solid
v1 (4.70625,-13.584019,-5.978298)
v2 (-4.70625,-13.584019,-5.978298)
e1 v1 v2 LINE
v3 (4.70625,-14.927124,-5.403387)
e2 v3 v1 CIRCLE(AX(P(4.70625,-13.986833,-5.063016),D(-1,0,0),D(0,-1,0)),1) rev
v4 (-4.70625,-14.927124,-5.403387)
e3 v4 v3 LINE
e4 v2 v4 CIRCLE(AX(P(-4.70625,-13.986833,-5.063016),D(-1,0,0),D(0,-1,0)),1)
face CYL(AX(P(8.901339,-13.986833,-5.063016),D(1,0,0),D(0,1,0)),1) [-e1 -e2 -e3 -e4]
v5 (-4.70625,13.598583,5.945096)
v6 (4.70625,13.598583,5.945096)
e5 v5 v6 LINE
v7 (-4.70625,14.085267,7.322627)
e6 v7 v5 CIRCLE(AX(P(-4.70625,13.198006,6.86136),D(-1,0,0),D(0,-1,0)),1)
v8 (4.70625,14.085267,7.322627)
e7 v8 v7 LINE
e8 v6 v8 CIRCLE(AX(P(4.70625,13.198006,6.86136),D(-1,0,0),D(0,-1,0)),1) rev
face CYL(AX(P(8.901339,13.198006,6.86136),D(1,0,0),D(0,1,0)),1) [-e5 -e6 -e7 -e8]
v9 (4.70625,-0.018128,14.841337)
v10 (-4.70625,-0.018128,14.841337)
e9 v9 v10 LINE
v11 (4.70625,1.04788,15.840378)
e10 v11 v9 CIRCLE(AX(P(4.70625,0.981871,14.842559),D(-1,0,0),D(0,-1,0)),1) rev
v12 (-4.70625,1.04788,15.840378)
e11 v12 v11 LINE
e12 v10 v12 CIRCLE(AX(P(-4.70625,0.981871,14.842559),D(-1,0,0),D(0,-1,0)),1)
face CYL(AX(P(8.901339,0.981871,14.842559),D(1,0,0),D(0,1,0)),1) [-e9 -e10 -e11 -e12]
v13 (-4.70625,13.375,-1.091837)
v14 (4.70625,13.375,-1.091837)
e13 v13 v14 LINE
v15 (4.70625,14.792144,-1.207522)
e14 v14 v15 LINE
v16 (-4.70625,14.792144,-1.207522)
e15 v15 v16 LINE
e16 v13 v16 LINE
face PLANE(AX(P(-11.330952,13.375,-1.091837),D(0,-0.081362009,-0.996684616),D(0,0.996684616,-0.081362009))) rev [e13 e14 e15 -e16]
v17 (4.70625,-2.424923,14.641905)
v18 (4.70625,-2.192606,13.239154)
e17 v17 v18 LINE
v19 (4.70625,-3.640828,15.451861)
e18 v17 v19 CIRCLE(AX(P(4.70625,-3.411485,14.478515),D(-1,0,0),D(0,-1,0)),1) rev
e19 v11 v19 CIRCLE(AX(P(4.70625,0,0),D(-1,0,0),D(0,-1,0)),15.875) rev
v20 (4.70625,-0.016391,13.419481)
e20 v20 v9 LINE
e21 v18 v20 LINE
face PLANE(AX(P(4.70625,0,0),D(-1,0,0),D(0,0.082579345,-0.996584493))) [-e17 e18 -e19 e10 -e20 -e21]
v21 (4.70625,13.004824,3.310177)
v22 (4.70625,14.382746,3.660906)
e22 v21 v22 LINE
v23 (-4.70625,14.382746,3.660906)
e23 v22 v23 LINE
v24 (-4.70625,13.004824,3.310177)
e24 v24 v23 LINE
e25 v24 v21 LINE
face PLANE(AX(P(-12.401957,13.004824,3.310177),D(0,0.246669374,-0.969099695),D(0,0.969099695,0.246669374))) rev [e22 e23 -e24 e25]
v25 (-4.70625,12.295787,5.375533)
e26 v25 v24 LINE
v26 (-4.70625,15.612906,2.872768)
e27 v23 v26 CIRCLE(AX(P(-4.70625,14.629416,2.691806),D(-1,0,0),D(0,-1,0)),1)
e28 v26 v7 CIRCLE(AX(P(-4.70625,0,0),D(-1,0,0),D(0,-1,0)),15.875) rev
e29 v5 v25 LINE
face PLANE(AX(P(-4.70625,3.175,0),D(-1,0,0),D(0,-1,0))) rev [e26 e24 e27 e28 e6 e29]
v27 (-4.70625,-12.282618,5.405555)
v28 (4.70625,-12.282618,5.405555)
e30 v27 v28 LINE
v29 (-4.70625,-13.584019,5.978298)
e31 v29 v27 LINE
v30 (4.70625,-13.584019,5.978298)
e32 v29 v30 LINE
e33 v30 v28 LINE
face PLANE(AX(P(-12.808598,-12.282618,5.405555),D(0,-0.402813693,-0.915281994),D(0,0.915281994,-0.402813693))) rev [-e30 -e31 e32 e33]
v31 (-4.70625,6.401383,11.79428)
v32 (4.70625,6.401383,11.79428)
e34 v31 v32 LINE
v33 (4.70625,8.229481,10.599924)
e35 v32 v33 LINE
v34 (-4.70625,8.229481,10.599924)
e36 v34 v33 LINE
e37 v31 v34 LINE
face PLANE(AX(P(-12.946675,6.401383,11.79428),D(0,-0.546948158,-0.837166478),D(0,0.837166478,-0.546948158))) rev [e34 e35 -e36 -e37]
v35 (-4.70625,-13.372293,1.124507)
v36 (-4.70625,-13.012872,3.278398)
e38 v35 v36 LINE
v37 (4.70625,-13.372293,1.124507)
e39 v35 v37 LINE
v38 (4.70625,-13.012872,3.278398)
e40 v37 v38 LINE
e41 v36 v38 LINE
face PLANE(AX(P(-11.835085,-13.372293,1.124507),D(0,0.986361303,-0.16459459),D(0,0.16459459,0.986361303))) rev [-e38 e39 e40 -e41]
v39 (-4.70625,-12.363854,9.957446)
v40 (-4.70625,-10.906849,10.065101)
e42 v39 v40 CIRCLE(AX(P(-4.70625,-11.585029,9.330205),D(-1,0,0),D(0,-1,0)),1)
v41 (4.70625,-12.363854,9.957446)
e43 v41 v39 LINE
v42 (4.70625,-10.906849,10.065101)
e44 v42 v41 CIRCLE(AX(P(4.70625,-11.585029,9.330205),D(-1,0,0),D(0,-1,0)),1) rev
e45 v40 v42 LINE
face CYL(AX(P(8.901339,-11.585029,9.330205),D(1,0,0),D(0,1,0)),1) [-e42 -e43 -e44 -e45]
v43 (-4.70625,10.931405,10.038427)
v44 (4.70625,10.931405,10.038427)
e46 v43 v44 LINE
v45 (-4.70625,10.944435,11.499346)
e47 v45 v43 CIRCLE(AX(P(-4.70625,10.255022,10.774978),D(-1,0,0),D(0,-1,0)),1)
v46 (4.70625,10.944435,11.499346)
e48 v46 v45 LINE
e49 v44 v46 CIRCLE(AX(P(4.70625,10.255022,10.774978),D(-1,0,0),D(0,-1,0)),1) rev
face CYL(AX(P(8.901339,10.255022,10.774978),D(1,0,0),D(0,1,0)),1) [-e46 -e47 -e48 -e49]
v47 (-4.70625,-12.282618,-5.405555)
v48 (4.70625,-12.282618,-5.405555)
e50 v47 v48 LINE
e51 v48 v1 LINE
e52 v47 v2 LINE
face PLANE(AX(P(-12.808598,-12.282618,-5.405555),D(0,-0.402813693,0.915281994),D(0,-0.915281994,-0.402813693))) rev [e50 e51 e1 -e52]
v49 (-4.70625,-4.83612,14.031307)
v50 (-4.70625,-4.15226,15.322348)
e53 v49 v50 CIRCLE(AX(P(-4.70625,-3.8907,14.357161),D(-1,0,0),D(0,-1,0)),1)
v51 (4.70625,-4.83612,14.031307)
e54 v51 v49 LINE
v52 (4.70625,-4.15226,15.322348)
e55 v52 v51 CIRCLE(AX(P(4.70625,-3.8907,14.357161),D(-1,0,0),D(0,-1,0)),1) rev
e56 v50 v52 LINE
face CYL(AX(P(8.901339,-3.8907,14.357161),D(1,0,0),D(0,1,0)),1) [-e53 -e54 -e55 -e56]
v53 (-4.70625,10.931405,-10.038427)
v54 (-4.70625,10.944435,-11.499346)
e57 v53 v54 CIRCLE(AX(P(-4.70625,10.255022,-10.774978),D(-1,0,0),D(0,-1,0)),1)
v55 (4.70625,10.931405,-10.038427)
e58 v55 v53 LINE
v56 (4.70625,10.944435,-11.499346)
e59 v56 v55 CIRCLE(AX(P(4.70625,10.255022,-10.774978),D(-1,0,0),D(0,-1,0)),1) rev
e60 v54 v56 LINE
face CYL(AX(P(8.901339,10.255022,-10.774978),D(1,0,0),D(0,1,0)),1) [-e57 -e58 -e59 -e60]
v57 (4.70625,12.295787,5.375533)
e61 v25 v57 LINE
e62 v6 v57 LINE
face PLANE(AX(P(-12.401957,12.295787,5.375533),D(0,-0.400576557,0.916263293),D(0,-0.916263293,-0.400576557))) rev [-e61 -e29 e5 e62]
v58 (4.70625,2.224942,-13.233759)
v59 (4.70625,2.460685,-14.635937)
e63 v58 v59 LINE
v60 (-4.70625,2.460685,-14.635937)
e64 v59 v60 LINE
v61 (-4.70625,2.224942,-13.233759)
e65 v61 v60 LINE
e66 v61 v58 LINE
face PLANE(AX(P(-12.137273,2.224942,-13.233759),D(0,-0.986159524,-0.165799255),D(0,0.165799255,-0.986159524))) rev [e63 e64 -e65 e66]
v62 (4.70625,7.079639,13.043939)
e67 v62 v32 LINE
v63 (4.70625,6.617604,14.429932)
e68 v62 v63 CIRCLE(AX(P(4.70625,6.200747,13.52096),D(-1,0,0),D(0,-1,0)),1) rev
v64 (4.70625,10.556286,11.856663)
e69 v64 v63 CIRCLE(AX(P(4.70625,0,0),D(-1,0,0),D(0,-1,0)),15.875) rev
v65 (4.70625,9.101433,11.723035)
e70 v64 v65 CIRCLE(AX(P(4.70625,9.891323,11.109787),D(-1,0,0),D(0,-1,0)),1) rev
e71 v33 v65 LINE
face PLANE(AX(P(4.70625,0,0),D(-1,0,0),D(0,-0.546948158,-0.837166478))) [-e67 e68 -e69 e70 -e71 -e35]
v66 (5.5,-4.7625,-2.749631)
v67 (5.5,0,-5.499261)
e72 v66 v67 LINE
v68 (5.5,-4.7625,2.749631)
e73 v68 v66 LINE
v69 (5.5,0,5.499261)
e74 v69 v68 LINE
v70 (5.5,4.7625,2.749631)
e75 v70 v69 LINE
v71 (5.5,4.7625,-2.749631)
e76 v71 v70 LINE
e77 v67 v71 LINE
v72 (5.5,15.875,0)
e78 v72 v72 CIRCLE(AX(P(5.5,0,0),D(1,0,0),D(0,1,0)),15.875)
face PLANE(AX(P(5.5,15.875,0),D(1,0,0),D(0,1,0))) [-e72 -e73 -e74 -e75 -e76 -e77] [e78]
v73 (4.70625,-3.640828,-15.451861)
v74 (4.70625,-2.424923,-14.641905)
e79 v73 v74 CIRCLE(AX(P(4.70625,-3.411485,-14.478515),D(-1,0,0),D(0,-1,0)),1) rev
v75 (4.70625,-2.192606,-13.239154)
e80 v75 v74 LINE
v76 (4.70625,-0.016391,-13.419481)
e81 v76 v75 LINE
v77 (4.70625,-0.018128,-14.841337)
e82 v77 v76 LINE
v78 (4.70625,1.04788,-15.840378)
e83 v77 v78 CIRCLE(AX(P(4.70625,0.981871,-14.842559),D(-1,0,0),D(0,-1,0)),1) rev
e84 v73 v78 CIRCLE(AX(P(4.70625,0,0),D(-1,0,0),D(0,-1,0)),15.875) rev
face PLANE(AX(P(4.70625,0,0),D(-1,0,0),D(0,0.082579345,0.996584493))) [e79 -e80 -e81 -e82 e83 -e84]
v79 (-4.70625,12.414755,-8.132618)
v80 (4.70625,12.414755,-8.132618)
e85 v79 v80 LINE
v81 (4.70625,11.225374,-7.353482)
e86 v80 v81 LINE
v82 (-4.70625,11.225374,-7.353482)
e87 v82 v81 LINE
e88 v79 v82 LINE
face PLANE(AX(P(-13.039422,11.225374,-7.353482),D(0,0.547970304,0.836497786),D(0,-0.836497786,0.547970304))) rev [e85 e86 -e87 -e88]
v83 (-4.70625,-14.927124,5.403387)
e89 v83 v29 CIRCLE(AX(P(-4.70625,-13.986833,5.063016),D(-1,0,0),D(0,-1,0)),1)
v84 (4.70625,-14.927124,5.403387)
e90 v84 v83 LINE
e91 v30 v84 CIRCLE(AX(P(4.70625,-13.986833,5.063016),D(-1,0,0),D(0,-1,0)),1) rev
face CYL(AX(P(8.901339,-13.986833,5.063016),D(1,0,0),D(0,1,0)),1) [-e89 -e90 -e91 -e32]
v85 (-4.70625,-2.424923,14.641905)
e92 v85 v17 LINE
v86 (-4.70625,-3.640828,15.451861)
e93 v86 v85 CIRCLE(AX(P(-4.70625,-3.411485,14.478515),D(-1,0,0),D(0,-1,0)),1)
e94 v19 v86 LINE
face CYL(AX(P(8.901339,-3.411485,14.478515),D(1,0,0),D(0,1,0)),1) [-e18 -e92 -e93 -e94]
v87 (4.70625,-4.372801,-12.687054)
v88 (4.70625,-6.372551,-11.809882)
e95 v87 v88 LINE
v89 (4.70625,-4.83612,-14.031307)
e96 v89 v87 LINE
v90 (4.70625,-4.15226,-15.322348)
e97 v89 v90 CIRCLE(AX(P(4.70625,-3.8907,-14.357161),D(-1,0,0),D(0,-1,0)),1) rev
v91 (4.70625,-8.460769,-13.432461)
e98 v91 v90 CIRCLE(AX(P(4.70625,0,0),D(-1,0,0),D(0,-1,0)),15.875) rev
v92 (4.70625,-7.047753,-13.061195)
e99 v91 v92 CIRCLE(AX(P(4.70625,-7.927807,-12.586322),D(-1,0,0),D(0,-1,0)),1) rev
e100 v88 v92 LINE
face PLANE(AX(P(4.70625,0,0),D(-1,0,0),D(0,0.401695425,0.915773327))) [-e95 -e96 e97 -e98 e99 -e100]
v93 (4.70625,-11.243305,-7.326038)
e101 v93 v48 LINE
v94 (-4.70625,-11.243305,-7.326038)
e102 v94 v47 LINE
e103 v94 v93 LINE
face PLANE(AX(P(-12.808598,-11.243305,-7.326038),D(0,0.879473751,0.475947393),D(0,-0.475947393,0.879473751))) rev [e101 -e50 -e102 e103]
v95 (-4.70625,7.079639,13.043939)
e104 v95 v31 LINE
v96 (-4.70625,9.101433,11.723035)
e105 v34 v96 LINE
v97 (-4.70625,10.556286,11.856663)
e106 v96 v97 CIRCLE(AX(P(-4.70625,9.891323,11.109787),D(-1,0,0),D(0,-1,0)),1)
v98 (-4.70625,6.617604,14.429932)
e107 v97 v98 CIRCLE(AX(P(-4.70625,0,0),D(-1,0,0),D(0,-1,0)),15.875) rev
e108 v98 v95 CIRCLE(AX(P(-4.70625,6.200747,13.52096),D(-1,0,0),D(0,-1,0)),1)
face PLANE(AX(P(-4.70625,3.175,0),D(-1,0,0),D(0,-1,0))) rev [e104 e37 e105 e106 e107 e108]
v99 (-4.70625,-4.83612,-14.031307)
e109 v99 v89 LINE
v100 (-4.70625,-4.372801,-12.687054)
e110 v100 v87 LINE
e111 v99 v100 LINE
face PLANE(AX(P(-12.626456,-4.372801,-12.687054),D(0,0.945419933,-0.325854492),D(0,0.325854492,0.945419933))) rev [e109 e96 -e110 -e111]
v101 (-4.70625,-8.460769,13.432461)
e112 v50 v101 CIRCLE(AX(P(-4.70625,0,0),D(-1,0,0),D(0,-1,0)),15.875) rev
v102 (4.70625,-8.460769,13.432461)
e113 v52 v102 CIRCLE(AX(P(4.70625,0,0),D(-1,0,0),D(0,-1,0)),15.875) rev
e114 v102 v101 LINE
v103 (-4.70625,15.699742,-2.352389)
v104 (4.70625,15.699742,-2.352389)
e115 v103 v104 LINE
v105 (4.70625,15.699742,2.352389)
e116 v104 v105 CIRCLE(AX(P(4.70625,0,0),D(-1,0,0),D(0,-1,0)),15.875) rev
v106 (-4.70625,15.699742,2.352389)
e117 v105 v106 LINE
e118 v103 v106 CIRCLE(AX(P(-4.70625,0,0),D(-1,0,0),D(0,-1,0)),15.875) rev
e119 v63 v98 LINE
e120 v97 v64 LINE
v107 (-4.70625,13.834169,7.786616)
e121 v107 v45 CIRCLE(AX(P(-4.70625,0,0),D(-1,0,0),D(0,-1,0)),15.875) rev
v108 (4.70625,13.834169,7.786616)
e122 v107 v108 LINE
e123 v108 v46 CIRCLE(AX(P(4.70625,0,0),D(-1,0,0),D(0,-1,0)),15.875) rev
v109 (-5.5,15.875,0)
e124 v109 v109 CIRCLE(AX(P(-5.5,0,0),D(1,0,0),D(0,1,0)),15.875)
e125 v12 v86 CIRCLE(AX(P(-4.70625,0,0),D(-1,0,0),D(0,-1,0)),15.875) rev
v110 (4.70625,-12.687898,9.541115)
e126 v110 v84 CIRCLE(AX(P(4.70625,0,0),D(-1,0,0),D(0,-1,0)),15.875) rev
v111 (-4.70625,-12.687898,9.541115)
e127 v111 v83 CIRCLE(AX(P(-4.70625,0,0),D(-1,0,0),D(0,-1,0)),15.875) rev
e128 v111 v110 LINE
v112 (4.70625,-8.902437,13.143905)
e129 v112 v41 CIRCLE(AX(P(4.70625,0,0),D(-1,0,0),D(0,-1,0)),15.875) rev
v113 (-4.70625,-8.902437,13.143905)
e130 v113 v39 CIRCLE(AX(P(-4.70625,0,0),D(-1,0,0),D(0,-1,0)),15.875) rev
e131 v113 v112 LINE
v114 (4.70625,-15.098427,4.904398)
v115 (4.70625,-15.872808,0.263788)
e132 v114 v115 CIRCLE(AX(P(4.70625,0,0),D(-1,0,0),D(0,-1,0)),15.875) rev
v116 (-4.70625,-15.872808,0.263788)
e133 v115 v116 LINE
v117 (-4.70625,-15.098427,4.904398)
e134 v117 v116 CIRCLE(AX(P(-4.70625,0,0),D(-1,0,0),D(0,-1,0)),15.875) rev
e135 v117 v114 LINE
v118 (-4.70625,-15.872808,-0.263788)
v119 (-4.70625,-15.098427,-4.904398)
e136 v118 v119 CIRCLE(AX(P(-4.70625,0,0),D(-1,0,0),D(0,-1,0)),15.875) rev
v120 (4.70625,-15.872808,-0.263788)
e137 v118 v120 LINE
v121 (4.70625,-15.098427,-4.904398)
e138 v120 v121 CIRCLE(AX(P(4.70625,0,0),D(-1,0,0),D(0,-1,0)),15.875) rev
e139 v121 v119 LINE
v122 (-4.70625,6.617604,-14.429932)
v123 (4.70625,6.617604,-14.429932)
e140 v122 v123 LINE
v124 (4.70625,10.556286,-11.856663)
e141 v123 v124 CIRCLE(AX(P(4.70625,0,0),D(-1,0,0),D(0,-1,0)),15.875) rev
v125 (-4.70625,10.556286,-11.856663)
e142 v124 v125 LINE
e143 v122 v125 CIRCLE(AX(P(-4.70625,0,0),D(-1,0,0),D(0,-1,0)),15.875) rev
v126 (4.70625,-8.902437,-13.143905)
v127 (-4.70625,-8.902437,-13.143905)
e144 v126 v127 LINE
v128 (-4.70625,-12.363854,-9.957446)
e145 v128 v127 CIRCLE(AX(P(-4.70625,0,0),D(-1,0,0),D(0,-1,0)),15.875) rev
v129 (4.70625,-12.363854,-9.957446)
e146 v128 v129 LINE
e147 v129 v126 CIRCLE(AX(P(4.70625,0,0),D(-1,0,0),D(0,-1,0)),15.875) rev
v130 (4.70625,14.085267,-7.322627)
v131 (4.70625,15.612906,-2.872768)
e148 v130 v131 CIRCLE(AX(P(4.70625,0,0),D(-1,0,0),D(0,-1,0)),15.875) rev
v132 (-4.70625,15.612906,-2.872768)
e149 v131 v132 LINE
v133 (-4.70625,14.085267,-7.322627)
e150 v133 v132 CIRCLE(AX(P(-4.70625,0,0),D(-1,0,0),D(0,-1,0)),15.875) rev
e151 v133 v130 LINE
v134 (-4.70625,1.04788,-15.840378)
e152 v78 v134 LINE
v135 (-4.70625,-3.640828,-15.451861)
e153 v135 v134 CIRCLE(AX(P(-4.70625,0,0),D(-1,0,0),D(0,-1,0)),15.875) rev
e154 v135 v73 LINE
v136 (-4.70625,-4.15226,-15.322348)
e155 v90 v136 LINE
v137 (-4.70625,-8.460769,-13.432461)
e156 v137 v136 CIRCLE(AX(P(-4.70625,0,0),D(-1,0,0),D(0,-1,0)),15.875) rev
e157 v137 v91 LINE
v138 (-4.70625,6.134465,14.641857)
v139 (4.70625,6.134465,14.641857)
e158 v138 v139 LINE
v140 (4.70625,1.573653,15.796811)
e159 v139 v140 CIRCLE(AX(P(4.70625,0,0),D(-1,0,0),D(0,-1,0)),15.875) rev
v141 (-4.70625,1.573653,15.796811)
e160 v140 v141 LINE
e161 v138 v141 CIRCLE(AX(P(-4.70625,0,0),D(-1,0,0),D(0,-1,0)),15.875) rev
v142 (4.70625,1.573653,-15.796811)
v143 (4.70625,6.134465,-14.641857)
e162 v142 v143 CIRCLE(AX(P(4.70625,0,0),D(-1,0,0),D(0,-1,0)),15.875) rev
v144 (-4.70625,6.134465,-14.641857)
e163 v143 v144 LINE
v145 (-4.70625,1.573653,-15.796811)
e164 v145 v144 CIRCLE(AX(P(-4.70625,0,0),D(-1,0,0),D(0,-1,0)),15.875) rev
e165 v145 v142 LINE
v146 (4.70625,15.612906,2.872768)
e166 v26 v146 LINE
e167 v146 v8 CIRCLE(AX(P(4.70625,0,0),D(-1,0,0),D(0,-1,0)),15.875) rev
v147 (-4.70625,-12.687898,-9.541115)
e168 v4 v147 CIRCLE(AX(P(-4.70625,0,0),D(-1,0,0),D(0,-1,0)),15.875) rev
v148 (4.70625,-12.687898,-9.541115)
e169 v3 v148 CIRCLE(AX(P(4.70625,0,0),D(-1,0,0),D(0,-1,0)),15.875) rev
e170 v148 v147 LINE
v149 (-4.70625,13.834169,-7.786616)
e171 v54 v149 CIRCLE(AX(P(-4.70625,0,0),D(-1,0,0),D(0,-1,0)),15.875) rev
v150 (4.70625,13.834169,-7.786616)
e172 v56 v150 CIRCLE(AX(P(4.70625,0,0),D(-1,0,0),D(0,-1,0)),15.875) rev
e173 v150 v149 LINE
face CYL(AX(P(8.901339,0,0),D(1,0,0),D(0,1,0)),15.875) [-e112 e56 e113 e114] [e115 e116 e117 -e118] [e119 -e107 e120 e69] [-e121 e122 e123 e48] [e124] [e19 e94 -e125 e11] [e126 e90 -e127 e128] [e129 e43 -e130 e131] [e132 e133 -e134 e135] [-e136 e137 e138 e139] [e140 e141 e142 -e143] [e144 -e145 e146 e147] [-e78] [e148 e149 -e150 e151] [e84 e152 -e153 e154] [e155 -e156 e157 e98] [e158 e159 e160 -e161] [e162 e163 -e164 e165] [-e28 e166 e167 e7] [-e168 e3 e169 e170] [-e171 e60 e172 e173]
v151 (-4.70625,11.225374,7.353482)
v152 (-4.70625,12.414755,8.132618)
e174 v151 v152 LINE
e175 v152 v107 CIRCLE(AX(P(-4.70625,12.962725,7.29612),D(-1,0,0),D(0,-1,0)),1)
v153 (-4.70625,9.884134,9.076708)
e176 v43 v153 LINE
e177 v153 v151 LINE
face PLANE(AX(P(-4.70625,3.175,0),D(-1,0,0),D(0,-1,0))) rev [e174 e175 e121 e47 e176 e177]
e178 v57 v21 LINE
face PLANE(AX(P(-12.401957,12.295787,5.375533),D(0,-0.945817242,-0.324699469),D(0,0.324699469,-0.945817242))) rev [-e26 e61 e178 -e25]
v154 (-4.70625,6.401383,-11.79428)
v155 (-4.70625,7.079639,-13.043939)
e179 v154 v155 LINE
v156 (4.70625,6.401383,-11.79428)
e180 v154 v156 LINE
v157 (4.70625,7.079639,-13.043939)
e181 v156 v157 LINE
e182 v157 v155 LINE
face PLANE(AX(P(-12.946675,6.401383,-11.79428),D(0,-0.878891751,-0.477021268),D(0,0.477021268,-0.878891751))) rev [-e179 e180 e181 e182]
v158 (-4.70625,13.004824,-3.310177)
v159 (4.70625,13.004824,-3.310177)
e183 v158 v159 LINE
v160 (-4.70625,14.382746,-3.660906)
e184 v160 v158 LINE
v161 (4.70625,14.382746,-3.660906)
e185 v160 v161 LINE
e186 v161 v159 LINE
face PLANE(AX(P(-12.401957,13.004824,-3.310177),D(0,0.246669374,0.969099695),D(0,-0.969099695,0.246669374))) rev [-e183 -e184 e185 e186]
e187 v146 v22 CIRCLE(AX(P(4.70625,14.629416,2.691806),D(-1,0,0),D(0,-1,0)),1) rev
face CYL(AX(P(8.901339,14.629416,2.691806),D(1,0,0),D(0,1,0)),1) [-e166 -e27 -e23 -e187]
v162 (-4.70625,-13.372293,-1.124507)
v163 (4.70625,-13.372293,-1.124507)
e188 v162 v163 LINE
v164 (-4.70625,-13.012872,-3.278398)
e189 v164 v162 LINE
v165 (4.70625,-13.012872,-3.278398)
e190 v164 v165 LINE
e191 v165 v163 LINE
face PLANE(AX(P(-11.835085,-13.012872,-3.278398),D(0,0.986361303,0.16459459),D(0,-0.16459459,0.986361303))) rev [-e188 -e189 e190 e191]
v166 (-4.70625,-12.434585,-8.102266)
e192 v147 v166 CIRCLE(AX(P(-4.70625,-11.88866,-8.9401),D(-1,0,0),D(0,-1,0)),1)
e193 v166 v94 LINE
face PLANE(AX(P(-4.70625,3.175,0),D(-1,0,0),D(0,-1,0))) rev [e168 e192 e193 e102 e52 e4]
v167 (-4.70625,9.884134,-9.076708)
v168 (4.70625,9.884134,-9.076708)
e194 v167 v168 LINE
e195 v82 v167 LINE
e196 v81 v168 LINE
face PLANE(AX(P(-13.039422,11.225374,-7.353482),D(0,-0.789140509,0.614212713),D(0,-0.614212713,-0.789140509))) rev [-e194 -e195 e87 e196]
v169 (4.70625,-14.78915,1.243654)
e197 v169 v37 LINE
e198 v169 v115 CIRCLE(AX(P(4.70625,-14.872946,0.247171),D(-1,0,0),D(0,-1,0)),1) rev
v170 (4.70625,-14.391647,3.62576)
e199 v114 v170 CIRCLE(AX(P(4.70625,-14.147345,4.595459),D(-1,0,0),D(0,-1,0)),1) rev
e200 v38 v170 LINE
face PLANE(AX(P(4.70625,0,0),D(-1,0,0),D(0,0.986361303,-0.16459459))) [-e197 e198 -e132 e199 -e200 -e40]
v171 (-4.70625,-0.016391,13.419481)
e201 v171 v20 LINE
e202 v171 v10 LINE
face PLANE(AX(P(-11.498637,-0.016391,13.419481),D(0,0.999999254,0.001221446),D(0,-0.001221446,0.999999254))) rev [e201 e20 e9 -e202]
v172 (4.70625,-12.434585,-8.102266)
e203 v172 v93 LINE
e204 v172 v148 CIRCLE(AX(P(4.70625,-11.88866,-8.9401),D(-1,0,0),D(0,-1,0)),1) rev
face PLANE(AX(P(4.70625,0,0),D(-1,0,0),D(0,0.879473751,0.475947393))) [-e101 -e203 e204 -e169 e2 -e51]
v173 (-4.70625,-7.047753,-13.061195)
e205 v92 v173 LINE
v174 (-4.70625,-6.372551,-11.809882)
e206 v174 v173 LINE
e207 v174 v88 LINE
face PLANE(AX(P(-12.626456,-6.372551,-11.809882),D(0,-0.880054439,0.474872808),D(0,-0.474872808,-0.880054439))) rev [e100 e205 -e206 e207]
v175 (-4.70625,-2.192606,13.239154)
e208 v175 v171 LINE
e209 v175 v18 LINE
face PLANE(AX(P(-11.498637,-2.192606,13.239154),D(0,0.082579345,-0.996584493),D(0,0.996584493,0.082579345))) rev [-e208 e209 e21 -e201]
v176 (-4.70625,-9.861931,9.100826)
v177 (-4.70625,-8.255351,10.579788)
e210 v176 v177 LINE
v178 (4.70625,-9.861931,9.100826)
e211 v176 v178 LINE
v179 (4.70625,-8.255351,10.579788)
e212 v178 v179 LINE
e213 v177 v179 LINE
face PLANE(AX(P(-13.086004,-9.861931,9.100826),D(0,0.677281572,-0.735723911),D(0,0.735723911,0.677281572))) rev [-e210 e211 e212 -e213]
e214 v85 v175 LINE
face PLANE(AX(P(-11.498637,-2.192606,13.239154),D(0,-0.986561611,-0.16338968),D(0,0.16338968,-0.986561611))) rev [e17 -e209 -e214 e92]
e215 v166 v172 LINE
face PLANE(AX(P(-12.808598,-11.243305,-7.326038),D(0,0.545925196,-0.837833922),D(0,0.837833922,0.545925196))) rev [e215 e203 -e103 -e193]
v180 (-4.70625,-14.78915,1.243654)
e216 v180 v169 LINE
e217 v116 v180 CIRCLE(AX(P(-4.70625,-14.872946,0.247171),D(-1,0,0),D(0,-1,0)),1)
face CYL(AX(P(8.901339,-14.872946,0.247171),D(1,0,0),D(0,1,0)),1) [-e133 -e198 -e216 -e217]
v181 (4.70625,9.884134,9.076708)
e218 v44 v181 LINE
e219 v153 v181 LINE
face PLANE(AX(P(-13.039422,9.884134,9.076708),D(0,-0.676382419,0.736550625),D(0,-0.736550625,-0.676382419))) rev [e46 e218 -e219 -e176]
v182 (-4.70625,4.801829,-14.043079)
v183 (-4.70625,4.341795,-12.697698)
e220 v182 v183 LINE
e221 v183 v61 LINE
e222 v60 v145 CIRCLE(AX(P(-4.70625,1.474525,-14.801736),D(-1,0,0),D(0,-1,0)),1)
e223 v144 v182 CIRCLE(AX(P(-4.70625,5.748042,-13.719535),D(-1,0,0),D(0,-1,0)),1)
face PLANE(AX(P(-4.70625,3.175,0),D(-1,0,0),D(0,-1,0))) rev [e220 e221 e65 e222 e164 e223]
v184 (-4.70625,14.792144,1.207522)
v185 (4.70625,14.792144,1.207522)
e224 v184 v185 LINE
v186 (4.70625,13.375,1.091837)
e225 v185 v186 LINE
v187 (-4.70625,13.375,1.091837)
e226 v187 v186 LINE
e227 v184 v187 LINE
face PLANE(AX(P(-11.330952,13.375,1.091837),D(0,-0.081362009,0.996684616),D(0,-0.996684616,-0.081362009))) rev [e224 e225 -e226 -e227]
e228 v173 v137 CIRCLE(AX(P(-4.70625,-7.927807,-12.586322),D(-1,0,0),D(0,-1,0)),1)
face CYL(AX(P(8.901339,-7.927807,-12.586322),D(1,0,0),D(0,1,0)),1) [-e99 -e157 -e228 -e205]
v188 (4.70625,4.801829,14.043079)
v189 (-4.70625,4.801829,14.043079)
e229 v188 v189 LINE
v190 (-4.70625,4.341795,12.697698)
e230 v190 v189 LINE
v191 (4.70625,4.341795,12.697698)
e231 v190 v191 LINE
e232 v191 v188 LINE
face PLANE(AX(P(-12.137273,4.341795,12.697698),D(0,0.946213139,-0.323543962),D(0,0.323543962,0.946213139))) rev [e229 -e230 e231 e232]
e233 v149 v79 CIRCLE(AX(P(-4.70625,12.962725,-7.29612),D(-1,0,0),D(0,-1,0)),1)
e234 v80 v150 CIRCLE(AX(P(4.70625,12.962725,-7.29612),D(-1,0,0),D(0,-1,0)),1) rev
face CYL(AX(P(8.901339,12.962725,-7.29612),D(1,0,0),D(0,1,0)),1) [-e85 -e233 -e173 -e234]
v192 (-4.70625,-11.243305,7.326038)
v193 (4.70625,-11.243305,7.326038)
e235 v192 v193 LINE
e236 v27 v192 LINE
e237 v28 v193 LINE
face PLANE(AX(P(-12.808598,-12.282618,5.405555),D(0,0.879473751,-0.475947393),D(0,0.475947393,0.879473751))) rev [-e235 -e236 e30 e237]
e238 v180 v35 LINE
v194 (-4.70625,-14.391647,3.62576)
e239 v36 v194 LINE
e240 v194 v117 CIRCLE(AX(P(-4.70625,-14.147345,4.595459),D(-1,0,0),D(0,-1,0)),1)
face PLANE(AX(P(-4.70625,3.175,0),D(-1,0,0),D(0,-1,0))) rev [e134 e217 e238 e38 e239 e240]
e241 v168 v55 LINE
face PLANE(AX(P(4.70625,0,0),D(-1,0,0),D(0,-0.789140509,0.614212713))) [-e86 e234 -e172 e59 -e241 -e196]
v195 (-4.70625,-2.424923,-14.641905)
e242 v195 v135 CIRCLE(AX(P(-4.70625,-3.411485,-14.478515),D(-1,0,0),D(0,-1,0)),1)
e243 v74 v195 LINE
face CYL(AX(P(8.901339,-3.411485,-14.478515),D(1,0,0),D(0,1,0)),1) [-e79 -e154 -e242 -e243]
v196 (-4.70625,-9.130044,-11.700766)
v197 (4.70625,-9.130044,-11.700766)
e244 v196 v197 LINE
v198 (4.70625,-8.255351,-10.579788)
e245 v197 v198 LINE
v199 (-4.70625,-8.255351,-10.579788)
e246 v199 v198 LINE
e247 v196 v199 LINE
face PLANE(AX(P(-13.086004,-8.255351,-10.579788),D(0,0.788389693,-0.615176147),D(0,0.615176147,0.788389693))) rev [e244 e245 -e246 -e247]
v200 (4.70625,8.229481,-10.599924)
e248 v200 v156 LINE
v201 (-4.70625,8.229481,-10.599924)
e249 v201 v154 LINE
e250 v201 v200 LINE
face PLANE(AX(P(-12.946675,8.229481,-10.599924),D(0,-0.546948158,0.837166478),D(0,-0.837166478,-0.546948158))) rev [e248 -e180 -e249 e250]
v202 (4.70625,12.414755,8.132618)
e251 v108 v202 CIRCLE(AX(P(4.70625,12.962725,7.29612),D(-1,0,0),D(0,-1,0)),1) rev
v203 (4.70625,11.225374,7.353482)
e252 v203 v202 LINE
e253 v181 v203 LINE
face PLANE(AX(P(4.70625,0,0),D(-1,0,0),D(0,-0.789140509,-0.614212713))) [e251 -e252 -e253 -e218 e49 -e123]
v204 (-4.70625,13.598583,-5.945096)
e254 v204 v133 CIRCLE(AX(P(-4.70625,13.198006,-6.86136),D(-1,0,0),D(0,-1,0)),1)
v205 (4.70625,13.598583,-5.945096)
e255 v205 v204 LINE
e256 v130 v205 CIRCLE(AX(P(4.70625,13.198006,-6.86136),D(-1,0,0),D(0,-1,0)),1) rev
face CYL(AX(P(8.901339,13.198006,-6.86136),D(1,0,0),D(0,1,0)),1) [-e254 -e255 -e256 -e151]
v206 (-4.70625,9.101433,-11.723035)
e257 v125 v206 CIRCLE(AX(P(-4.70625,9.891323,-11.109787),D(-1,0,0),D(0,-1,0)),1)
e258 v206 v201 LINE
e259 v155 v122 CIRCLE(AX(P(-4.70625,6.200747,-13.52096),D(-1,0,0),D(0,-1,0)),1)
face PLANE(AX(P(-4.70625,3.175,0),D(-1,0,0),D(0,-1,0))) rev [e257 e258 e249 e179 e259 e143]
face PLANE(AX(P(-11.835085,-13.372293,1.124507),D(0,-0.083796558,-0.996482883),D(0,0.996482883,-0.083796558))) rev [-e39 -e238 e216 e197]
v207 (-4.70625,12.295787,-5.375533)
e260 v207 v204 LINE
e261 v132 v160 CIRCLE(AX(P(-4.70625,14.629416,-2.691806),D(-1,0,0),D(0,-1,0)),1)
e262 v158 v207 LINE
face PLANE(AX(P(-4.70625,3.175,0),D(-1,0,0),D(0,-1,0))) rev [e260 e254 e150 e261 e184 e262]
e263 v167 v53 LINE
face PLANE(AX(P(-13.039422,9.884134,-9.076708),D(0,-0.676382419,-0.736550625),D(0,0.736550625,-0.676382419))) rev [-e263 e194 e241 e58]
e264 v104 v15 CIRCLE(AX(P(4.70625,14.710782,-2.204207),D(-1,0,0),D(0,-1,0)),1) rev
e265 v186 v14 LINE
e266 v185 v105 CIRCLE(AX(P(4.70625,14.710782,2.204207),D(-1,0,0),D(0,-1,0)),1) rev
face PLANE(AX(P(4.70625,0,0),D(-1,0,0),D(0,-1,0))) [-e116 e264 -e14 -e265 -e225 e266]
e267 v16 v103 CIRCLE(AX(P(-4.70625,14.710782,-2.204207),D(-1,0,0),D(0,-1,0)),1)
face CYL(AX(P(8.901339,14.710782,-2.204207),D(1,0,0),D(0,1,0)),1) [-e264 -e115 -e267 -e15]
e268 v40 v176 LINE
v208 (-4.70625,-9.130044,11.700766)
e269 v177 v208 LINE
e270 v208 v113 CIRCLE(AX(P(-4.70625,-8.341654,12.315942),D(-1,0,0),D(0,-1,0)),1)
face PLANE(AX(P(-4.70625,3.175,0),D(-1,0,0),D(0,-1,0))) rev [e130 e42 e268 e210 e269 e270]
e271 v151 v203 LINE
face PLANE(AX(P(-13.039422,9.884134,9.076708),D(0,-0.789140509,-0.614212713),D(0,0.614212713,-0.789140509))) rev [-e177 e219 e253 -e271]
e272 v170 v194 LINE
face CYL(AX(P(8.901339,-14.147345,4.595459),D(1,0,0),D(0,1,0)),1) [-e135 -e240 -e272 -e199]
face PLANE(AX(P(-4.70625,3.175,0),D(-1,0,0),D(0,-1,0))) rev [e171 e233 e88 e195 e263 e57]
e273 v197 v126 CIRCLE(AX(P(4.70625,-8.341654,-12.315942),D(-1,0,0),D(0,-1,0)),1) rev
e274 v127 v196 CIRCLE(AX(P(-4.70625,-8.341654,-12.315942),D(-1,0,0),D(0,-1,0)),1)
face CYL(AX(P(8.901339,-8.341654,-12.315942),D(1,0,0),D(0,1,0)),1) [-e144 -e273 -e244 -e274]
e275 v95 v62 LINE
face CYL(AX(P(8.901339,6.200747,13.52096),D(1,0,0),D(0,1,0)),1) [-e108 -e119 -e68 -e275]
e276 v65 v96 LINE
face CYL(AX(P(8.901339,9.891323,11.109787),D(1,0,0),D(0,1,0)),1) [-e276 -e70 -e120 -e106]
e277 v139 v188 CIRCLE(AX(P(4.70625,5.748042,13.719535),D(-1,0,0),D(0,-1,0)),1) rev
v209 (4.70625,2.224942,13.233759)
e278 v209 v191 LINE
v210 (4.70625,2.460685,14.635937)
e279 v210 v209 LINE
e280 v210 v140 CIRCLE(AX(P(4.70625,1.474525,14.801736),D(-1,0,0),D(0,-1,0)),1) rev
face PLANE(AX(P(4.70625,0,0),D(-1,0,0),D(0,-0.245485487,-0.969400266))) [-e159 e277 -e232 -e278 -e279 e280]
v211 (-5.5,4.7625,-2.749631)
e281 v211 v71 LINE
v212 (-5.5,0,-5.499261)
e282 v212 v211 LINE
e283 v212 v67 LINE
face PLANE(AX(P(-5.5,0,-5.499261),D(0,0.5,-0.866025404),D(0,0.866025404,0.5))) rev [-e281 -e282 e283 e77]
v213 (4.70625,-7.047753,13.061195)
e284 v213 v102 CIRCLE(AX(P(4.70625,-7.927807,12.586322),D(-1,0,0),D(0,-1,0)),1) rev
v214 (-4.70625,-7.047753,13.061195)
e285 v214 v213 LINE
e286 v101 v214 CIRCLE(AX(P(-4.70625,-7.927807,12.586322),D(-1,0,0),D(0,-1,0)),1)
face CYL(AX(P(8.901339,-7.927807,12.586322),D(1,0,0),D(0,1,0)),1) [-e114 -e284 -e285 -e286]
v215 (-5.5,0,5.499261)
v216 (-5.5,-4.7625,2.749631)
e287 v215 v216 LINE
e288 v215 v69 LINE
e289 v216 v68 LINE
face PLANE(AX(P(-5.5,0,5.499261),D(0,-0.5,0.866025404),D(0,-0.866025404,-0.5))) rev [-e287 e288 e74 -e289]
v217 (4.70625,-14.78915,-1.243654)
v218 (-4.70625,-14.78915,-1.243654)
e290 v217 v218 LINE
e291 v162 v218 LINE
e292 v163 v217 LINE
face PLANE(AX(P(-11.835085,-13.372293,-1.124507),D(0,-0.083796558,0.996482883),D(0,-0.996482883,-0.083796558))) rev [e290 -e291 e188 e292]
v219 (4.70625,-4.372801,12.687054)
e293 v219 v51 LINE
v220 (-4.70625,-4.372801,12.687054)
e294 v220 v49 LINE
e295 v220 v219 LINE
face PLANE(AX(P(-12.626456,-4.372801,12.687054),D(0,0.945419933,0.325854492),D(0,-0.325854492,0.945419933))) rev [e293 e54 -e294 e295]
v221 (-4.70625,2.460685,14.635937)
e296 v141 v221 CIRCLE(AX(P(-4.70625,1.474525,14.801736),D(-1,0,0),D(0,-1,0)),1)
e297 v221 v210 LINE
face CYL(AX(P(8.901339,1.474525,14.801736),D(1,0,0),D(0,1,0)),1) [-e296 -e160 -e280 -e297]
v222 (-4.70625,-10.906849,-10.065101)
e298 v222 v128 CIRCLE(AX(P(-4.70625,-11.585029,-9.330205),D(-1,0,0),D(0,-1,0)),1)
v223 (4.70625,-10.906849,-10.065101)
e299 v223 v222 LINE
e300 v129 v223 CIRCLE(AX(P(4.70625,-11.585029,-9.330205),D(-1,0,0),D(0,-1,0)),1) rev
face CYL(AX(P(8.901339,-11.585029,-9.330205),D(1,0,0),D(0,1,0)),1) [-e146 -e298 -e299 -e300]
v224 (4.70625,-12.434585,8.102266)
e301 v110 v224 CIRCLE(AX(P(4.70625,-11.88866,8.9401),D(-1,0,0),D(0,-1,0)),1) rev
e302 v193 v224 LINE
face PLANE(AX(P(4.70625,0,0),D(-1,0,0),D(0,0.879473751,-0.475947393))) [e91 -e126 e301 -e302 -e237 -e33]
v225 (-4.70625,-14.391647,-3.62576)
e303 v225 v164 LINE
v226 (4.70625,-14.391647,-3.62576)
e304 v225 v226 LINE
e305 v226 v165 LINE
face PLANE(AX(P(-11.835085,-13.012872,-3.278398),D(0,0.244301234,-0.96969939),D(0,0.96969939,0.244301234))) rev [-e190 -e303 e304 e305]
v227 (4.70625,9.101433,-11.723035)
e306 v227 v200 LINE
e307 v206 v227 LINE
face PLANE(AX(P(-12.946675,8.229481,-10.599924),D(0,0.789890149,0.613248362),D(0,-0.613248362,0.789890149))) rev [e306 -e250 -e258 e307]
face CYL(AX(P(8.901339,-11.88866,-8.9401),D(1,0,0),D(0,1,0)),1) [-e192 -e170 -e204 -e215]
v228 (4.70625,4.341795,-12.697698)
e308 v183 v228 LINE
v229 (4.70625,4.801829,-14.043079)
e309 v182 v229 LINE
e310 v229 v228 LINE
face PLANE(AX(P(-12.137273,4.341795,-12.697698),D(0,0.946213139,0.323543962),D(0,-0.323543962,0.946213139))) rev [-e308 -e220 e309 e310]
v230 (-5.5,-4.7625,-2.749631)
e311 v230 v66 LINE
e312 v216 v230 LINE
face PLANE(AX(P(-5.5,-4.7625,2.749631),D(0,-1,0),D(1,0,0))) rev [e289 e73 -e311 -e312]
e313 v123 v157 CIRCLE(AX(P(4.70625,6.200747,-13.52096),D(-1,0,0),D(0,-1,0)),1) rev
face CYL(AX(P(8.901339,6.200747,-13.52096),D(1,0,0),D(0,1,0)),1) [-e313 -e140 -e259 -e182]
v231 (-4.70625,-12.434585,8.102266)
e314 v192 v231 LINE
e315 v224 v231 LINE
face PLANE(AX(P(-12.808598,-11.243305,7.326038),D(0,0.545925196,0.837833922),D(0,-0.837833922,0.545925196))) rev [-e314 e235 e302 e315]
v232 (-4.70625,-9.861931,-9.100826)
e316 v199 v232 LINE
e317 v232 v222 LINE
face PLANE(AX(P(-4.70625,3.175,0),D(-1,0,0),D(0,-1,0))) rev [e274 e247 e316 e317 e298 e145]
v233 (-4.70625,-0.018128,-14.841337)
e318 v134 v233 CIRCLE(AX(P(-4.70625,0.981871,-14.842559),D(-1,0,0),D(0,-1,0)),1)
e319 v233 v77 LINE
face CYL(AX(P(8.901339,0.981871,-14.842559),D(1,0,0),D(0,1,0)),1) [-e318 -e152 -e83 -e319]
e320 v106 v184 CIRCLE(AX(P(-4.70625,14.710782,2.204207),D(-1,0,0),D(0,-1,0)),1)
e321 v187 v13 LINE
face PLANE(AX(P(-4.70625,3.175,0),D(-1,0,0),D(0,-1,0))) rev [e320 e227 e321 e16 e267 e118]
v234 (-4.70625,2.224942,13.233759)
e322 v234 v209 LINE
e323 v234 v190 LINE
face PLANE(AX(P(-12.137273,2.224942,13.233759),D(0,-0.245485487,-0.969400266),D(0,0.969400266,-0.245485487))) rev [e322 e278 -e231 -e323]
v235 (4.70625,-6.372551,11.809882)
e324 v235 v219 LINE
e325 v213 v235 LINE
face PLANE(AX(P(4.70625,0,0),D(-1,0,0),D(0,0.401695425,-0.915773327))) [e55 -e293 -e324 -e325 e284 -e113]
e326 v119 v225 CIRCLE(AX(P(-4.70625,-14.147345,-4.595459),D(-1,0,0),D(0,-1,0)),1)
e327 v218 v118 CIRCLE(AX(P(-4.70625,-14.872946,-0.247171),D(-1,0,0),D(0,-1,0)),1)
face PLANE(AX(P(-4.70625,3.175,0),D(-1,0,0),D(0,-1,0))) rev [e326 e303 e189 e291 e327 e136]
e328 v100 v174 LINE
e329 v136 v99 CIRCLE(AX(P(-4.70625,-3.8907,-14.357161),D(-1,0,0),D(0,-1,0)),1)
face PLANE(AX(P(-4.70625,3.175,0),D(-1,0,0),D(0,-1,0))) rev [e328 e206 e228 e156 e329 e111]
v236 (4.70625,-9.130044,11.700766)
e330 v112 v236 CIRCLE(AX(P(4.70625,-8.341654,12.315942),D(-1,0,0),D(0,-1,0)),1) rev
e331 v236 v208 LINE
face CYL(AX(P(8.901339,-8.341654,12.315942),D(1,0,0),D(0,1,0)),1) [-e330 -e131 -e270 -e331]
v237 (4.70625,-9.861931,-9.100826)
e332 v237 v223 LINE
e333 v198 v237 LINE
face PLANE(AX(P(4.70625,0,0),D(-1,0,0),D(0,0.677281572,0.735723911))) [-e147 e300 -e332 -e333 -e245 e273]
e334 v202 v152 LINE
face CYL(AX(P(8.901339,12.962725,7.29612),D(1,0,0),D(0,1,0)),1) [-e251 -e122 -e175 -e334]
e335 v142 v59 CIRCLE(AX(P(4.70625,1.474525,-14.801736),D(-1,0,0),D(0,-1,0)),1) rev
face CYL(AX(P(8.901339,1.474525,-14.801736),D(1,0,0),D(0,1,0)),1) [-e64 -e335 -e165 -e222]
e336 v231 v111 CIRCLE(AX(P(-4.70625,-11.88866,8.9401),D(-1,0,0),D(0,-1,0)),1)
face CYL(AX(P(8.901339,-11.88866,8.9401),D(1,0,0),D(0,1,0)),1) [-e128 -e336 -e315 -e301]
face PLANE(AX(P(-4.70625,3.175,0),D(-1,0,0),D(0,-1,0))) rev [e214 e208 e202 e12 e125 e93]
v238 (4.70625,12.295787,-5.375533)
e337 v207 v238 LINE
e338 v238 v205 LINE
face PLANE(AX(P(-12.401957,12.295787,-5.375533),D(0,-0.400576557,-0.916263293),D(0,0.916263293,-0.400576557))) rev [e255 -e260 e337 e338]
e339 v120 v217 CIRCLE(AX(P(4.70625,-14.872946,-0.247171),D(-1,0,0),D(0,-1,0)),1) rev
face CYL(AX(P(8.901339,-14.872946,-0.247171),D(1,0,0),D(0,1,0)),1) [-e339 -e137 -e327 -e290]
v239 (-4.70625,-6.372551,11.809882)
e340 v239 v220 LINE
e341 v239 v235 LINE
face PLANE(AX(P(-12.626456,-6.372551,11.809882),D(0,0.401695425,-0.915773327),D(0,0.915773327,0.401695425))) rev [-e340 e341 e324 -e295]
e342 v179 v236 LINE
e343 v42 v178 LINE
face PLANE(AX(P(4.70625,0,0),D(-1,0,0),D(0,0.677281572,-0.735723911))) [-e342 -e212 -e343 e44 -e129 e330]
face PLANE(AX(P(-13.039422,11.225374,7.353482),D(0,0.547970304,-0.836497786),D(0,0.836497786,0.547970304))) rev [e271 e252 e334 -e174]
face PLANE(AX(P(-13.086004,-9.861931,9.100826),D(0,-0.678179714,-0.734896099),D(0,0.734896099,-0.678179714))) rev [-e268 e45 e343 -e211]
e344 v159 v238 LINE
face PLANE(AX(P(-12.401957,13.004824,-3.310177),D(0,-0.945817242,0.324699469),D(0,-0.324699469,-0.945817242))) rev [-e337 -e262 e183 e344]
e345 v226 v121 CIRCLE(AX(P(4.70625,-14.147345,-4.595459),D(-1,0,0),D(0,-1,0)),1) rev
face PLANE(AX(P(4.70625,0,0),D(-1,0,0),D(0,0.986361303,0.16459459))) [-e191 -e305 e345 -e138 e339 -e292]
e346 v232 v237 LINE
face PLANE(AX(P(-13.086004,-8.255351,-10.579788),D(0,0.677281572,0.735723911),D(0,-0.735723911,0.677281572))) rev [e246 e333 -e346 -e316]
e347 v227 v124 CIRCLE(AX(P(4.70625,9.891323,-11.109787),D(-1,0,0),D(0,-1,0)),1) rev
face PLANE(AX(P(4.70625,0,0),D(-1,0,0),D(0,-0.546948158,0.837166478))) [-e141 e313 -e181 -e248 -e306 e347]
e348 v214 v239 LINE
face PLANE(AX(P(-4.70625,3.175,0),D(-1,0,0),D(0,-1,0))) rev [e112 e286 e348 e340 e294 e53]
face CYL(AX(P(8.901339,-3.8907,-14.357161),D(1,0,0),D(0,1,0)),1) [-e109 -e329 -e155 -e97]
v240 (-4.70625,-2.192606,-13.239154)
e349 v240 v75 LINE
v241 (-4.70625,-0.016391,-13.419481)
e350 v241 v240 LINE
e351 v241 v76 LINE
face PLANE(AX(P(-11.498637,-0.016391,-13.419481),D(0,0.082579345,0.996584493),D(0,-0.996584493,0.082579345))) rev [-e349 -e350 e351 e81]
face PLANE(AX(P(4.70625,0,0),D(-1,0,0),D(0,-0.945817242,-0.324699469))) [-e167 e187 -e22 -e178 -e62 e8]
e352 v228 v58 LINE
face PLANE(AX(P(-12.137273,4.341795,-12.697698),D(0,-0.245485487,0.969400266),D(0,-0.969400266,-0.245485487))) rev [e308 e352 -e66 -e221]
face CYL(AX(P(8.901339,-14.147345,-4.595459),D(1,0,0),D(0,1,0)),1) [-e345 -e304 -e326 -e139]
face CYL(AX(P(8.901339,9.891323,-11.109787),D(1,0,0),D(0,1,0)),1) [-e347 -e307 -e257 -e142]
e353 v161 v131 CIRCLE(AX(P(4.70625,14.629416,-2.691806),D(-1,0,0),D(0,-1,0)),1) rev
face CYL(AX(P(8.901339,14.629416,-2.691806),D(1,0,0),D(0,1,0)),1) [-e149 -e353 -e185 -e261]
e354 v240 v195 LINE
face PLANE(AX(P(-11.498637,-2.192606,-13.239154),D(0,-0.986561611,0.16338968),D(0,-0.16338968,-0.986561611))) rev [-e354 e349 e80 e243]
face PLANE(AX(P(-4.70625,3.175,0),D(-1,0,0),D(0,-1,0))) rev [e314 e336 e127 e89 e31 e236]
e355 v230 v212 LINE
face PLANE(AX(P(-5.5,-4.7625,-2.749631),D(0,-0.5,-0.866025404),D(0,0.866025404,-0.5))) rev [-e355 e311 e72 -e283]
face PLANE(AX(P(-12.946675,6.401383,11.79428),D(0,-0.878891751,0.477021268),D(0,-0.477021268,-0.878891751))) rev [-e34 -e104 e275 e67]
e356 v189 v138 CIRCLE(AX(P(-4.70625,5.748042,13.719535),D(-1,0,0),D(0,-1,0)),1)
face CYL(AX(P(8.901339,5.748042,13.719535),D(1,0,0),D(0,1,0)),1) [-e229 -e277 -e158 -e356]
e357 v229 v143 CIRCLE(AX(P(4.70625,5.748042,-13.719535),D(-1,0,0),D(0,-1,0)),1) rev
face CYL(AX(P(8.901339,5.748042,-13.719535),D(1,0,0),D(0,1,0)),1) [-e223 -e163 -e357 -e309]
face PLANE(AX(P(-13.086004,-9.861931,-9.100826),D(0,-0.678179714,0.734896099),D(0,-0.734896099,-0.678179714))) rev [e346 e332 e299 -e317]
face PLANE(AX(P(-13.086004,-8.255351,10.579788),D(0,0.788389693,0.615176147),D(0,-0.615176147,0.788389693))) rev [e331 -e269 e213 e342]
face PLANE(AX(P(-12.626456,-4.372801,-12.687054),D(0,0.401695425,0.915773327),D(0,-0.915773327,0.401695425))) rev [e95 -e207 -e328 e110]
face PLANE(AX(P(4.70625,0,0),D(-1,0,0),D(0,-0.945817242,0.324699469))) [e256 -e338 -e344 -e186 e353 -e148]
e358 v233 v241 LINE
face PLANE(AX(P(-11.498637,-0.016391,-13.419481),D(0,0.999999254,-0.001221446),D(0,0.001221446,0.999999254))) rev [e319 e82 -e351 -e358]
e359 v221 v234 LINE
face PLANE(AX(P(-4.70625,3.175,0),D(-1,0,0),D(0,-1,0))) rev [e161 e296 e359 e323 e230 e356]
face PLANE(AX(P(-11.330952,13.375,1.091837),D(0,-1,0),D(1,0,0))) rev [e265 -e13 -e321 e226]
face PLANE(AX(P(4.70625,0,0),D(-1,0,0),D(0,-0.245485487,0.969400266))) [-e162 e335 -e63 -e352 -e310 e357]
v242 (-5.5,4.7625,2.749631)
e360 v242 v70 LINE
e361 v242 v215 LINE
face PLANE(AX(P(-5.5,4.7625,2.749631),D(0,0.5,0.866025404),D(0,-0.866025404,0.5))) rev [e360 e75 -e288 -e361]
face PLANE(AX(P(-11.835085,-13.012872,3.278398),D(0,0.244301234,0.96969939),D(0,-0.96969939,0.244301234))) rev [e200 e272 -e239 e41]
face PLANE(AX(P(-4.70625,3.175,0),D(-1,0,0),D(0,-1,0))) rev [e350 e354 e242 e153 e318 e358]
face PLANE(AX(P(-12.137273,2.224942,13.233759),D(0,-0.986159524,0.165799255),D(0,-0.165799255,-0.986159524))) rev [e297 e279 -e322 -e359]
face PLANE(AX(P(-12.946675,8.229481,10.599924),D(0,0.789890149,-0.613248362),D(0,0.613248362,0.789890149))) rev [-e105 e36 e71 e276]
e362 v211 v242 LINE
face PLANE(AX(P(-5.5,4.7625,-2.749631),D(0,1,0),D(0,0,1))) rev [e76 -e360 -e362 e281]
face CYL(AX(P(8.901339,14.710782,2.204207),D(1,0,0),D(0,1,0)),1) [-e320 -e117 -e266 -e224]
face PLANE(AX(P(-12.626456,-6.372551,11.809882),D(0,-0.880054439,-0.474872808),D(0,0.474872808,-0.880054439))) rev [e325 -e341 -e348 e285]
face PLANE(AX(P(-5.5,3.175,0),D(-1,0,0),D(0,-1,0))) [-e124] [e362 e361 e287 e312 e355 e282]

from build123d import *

# Parameters (mm, degrees)
REVOLVE1_START           = -5.5
REVOLVE1_OUTLINE_R       = 15.875
REVOLVE1_OUTLINE_R_2     = 3.175
REVOLVE1_DEPTH           = 11
CUT_EXTRUDE1_START       = -0.79375
CUT_EXTRUDE1_DEPTH       = 9.4125
FILLET1_R                = 1
CIRPATTERN1_COUNT        = 19
FILLET1_OF_CIRPATTERN1_R = 1
CUT_EXTRUDE2_DEPTH       = 26.000624992


# Read off the part's stored shape, not the designer's step: Revolve1
with BuildPart() as part:
    # Revolve1 outline → Revolve1 (new body)
    with BuildSketch(Plane.YZ.offset(REVOLVE1_START)):
        Circle(REVOLVE1_OUTLINE_R)
        Circle(REVOLVE1_OUTLINE_R_2, mode=Mode.SUBTRACT)
    extrude(amount=REVOLVE1_DEPTH)

    # Sketch2 → Cut-Extrude1 (cut)
    with BuildSketch(Plane(origin=(5.5, 0, 0), x_dir=(0, 0, -1), z_dir=(1, 0, 0)).offset(CUT_EXTRUDE1_START)):
        Polygon((-1.091836735, 13.375), (1.091836735, 13.375), (1.5, 18.375), (-1.5, 18.375), align=None)
    cut_extrude1 = extrude(amount=-CUT_EXTRUDE1_DEPTH, mode=Mode.SUBTRACT)

    # Fillet1
    fillet1_edges = [part.edges().sort_by_distance(p)[0] for p in [
        (0, 15.822368276, -1.2916219),
        (0, 15.822368276, 1.2916219),
    ]]
    fillet(fillet1_edges, radius=FILLET1_R)

    # CirPattern1: Cut-Extrude1 ×19 about axis
    cirpattern1_axis = Axis((0, 0, 0), (1, 0, 0))
    for i in range(1, CIRPATTERN1_COUNT):
        add(cut_extrude1.rotate(cirpattern1_axis, i * 360 / CIRPATTERN1_COUNT), mode=Mode.SUBTRACT)

    # Fillet1 of CirPattern1
    fillet1_of_cirpattern1_edges = [part.edges().sort_by_distance(p)[0] for p in [
        (0, 15.384457666, 3.915876318),
        (0, 14.545679775, 6.359152844),
        (0, 13.279402352, 8.699028576),
        (0, 11.69274117, 10.737570904),
        (0, 9.735317743, 12.539506108),
        (0, 7.572712628, 13.952406547),
        (0, 5.136260397, 15.021133583),
        (0, 2.632063171, 15.655282446),
        (0, -0.01939046, 15.874988158),
        (0, -2.593811173, 15.661665576),
        (0, -5.172940059, 15.008541439),
        (0, -7.538605828, 13.970864224),
        (0, -9.765921337, 12.515686375),
        (0, -11.666475568, 10.766102954),
        (0, -13.300613505, 8.66656249),
        (0, -14.530101657, 6.394667375),
        (0, -15.393977818, 3.878282085),
        (0, -15.819165773, 1.330270363),
        (0, -15.819165773, -1.330270363),
        (0, -15.393977818, -3.878282085),
        (0, -14.530101657, -6.394667375),
        (0, -13.300613505, -8.66656249),
        (0, -11.666475568, -10.766102954),
        (0, -9.765921337, -12.515686375),
        (0, -7.538605828, -13.970864224),
        (0, -5.172940059, -15.008541439),
        (0, -2.593811173, -15.661665576),
        (0, -0.01939046, -15.874988158),
        (0, 2.632063171, -15.655282446),
        (0, 5.136260397, -15.021133583),
        (0, 7.572712628, -13.952406547),
        (0, 9.735317743, -12.539506108),
        (0, 11.69274117, -10.737570904),
        (0, 13.279402352, -8.699028576),
        (0, 14.545679775, -6.359152844),
        (0, 15.384457666, -3.915876318),
    ]]
    fillet(fillet1_of_cirpattern1_edges, radius=FILLET1_OF_CIRPATTERN1_R)

    # Sketch3 → Cut-Extrude2 (cut, through all)
    with BuildSketch(Plane(origin=(5.5, 0, 0), x_dir=(0, 0, -1), z_dir=(1, 0, 0))):
        Polygon((5.499261314, 0), (2.749630657, 4.7625), (-2.749630657, 4.7625), (-5.499261314, 0), (-2.749630657, -4.7625), (2.749630657, -4.7625), align=None)
    extrude(amount=-CUT_EXTRUDE2_DEPTH, mode=Mode.SUBTRACT)


solid = part.part
